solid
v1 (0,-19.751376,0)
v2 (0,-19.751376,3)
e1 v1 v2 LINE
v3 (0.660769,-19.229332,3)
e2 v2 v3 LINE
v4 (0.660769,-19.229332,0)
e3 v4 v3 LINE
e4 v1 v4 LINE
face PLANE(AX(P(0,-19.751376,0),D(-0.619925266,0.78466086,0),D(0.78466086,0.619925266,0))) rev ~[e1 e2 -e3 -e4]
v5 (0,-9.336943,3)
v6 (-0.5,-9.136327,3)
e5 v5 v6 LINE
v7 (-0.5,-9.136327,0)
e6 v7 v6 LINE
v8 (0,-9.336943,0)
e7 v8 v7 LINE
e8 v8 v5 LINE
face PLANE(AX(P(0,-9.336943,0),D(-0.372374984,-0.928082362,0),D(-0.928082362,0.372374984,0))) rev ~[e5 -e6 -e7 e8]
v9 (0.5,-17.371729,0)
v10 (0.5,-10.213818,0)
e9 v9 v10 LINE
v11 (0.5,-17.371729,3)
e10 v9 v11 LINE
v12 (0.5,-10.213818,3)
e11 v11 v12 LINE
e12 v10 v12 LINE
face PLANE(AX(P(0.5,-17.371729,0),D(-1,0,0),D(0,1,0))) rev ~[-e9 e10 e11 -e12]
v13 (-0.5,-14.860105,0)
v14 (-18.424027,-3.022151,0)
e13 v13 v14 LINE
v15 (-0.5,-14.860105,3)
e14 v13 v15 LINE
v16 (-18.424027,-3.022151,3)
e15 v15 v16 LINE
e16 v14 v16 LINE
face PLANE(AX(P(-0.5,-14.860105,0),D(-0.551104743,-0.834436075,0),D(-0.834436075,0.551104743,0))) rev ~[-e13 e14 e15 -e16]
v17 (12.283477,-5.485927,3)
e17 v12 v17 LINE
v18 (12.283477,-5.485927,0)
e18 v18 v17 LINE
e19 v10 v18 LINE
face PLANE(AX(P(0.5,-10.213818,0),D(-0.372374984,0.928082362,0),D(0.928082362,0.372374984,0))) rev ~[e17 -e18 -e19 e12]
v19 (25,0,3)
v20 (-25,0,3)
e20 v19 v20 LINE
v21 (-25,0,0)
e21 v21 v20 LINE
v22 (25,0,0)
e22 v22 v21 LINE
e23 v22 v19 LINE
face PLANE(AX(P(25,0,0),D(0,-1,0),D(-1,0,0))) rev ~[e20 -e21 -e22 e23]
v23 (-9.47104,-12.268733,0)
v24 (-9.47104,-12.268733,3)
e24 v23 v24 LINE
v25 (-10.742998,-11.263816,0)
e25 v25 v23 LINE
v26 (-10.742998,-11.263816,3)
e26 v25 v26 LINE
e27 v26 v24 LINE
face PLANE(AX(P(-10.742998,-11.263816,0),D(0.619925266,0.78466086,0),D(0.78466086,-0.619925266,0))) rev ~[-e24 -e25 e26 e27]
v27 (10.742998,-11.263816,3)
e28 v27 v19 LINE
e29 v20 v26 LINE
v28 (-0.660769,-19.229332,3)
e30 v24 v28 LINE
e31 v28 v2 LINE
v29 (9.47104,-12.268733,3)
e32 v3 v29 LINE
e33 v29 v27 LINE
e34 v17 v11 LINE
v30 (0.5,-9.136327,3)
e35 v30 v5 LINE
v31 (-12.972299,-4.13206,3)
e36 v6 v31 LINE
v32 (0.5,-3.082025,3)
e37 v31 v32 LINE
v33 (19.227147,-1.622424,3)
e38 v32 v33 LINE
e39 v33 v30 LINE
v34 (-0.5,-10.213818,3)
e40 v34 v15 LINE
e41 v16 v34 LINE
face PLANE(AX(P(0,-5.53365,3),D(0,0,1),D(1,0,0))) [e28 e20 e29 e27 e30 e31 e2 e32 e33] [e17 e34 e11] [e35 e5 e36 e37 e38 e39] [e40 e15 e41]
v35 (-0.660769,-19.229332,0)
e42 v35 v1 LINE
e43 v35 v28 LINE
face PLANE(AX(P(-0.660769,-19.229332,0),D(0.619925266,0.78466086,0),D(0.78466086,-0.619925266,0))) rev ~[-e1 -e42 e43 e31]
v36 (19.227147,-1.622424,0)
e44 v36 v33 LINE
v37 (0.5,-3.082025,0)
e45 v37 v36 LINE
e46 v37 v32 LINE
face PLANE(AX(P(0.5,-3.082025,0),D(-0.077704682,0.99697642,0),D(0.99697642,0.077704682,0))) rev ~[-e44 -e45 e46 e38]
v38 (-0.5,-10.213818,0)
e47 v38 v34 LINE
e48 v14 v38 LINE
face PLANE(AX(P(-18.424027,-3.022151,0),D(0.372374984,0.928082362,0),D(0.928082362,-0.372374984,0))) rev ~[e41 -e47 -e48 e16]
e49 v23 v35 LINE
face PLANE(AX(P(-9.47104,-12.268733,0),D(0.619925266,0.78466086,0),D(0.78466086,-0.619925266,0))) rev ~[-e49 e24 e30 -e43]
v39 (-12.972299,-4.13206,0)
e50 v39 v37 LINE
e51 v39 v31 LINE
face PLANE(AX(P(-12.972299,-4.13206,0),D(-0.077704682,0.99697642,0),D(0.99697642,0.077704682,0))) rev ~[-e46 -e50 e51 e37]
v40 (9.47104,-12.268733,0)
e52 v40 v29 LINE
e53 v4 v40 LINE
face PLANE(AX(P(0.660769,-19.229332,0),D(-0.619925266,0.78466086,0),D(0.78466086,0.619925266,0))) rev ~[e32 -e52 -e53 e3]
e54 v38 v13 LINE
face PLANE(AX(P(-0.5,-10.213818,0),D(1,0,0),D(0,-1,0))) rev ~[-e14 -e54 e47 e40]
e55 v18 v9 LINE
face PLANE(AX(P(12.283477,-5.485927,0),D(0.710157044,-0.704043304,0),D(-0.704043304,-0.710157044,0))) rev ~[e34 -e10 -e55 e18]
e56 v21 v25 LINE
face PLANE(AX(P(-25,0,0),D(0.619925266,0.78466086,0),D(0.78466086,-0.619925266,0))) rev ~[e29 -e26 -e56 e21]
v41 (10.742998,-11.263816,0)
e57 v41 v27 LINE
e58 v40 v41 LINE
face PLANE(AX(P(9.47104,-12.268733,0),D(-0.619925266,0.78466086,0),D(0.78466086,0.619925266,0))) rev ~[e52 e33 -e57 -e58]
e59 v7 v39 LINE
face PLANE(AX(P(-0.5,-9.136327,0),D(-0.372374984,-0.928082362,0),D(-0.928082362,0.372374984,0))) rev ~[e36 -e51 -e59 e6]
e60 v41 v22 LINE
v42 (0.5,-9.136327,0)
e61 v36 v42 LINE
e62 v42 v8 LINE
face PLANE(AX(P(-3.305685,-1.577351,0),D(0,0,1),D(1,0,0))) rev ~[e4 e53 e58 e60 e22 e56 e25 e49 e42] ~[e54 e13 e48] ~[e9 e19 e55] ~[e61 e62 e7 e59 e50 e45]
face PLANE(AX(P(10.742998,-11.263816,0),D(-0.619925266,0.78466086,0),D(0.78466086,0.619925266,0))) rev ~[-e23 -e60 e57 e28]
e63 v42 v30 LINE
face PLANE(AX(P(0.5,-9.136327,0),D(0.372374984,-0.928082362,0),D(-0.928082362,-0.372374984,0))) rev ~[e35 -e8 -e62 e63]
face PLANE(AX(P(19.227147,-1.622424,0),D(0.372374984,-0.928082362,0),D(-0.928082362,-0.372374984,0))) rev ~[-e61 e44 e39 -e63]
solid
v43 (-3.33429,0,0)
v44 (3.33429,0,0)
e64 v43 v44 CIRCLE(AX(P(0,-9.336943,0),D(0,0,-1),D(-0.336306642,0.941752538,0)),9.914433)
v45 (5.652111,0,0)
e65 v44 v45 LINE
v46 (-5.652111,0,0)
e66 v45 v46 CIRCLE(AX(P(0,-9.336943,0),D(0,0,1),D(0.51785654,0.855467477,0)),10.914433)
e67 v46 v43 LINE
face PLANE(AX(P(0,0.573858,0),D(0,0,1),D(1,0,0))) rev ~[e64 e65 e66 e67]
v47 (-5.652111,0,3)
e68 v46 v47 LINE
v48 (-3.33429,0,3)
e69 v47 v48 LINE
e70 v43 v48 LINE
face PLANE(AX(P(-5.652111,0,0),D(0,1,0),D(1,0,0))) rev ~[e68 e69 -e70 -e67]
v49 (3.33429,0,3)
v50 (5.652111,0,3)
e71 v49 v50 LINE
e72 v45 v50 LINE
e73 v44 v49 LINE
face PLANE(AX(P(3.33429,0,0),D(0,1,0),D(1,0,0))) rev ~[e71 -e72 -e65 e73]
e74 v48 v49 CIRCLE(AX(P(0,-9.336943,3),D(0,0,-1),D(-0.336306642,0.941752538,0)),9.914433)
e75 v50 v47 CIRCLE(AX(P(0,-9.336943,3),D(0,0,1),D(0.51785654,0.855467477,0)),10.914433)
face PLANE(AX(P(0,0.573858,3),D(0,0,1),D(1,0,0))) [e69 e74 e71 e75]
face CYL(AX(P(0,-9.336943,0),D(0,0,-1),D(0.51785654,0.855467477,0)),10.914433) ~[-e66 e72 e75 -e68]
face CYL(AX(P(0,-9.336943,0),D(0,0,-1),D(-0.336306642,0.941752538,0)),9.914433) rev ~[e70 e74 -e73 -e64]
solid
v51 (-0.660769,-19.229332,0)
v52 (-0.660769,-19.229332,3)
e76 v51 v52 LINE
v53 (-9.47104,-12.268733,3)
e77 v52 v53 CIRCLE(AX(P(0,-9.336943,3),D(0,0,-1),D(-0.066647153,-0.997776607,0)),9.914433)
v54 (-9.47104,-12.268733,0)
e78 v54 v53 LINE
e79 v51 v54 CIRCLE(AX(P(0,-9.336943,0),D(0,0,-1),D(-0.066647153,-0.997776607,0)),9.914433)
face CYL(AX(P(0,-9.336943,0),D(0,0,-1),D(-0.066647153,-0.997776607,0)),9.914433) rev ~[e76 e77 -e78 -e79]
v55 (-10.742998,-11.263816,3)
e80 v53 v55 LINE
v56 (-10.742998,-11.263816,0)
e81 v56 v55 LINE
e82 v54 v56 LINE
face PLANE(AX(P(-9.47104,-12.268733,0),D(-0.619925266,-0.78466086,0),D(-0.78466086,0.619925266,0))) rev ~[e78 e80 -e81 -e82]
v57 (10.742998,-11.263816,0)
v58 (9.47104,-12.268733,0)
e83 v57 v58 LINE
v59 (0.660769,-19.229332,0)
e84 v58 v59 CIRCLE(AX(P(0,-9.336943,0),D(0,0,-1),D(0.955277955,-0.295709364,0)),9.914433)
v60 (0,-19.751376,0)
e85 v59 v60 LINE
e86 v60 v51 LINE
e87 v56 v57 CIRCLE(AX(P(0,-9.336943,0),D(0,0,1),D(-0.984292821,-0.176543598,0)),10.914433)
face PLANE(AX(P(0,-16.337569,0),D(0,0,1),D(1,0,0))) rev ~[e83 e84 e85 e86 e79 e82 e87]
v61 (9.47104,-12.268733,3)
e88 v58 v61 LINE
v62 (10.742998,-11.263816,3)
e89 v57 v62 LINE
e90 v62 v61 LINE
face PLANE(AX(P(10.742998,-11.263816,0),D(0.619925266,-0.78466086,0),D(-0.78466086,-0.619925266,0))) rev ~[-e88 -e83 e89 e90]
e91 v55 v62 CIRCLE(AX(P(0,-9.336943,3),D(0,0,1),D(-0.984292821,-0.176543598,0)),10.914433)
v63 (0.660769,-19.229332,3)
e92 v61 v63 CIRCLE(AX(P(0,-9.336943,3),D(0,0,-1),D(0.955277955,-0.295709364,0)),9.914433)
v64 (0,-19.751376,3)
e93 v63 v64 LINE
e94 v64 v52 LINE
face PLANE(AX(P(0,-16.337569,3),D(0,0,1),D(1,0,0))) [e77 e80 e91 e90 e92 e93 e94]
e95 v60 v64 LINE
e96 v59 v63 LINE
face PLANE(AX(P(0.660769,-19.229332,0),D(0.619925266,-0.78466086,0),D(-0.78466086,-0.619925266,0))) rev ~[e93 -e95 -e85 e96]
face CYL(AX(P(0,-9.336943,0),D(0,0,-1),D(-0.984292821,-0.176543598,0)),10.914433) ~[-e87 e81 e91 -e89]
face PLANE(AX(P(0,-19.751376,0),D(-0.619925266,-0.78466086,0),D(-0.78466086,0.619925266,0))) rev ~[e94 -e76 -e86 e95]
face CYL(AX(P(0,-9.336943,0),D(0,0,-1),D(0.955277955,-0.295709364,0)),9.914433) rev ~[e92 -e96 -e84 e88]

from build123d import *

# Parameters (mm, degrees)
F1_DEPTH = 3
F2_DEPTH = 3
F3_DEPTH = 3


# Not quite as in the source:
# - a feature names something its author has since deleted; it is built from what else it names


with BuildPart() as f1:
    # F0 (on Top) → F1 (new body)
    with BuildSketch(Plane.XY):
        Polygon((3.3342897613, 0), (0, 0), (-3.3342897613, 0), (-5.6521106464, 0), (-25, 0), (-10.7429983194, -11.263816016), (-9.4710395464, -12.2687334537), (-0.6607687547, -19.2293322859), (0, -19.7513759701), (0.6607687547, -19.2293322859), (9.4710395464, -12.2687334537), (10.7429983194, -11.263816016), (25, 0), (5.6521106464, 0), align=None)
        Polygon((-20.7355933027, -2.094680059), (-22.1211677314, -1), (-20.7784352121, -1), (0, -1), (14.3438164741, -1), (20.7784352121, -1), (22.1211677314, -1), (20.7355933027, -2.094680059), (3.7483545568, -15.5155336256), (0.5, -18.081912511), (0, -18.4769400304), (-0.5, -18.081912511), (-16.112200225, -5.7474150564), align=None, mode=Mode.SUBTRACT)
        Polygon((0.5, -17.3717289222), (0.5, -18.081912511), (3.7483545568, -15.5155336256), (14.6217098136, -4.5477568082), (12.2834767919, -5.4859272967), align=None)
        Polygon((-0.5, -16.0585195866), (-0.5, -18.081912511), (0, -18.4769400304), (0.5, -18.081912511), (0.5, -17.3717289222), (0.5, -10.2138180054), (0.5, -9.1363274287), (0, -9.3369426967), (-0.5, -9.1363274287), (-0.5, -10.2138180054), (-0.5, -14.8601054354), align=None)
        Polygon((22.1211677314, -1), (20.7784352121, -1), (19.2271466743, -1.6224243315), (0.5, -9.1363274287), (0.5, -10.2138180054), (12.2834767919, -5.4859272967), (14.6217098136, -4.5477568082), (20.7355933027, -2.094680059), align=None)
        Polygon((20.7784352121, -1), (14.3438164741, -1), (0.5, -2.0789917684), (0.5, -3.0820245179), (19.2271466743, -1.6224243315), align=None)
        Polygon((0.5, -2.0789917684), (-0.5, -2.1569321088), (-0.5, -3.1599648583), (0.5, -3.0820245179), align=None)
        Polygon((-0.5, -2.1569321088), (-15.0655666155, -3.2921773289), (-12.9722992677, -4.1320601088), (-0.5, -3.1599648583), align=None)
        Polygon((-20.7784352121, -1), (-22.1211677314, -1), (-20.7355933027, -2.094680059), (-18.4240265529, -3.022151225), (-0.5, -10.2138180054), (-0.5, -9.1363274287), (-12.9722992677, -4.1320601088), (-15.0655666155, -3.2921773289), align=None)
        Polygon((-18.4240265529, -3.022151225), (-20.7355933027, -2.094680059), (-16.112200225, -5.7474150564), (-0.5, -16.0585195866), (-0.5, -14.8601054354), align=None)
    extrude(amount=F1_DEPTH)

    # F0 (on Top) → F2 (join)
    with BuildSketch(Plane.XY):
        Polygon((0, -1), (-20.7784352121, -1), (-15.0655666155, -3.2921773289), (-0.5, -2.1569321088), (0.5, -2.0789917684), (14.3438164741, -1), align=None)
        Polygon((3.7483545568, -15.5155336256), (20.7355933027, -2.094680059), (14.6217098136, -4.5477568082), align=None)
        Polygon((-0.5, -16.0585195866), (-16.112200225, -5.7474150564), (-0.5, -18.081912511), align=None)
    extrude(amount=F2_DEPTH)


with BuildPart() as f3:
    # F0 (on Top) → F3 (new body)
    with BuildSketch(Plane.XY):
        with BuildLine():
            ThreePointArc((-3.3342897613, 0), (0, 0.5774905768), (3.3342897613, 0))
            Line((3.3342897613, 0), (5.6521106464, 0))
            ThreePointArc((5.6521106464, 0), (0, 1.5774905768), (-5.6521106464, 0))
            Line((-5.6521106464, 0), (-3.3342897613, 0))
        make_face()
    extrude(amount=F3_DEPTH)


with BuildPart() as f3b:
    # F0 (on Top) → F3, piece 2 (new body)
    with BuildSketch(Plane.XY):
        with BuildLine():
            ThreePointArc((-10.7429983194, -11.263816016), (0, -20.2513759701), (10.7429983194, -11.263816016))
            Line((10.7429983194, -11.263816016), (9.4710395464, -12.2687334537))
            ThreePointArc((9.4710395464, -12.2687334537), (6.1462076835, -17.116410432), (0.6607687547, -19.2293322859))
            Line((0.6607687547, -19.2293322859), (0, -19.7513759701))
            Line((0, -19.7513759701), (-0.6607687547, -19.2293322859))
            ThreePointArc((-0.6607687547, -19.2293322859), (-6.1462076835, -17.116410432), (-9.4710395464, -12.2687334537))
            Line((-9.4710395464, -12.2687334537), (-10.7429983194, -11.263816016))
        make_face()
    extrude(amount=F3_DEPTH)


solid = Compound([f1.part, f3.part, f3b.part])
